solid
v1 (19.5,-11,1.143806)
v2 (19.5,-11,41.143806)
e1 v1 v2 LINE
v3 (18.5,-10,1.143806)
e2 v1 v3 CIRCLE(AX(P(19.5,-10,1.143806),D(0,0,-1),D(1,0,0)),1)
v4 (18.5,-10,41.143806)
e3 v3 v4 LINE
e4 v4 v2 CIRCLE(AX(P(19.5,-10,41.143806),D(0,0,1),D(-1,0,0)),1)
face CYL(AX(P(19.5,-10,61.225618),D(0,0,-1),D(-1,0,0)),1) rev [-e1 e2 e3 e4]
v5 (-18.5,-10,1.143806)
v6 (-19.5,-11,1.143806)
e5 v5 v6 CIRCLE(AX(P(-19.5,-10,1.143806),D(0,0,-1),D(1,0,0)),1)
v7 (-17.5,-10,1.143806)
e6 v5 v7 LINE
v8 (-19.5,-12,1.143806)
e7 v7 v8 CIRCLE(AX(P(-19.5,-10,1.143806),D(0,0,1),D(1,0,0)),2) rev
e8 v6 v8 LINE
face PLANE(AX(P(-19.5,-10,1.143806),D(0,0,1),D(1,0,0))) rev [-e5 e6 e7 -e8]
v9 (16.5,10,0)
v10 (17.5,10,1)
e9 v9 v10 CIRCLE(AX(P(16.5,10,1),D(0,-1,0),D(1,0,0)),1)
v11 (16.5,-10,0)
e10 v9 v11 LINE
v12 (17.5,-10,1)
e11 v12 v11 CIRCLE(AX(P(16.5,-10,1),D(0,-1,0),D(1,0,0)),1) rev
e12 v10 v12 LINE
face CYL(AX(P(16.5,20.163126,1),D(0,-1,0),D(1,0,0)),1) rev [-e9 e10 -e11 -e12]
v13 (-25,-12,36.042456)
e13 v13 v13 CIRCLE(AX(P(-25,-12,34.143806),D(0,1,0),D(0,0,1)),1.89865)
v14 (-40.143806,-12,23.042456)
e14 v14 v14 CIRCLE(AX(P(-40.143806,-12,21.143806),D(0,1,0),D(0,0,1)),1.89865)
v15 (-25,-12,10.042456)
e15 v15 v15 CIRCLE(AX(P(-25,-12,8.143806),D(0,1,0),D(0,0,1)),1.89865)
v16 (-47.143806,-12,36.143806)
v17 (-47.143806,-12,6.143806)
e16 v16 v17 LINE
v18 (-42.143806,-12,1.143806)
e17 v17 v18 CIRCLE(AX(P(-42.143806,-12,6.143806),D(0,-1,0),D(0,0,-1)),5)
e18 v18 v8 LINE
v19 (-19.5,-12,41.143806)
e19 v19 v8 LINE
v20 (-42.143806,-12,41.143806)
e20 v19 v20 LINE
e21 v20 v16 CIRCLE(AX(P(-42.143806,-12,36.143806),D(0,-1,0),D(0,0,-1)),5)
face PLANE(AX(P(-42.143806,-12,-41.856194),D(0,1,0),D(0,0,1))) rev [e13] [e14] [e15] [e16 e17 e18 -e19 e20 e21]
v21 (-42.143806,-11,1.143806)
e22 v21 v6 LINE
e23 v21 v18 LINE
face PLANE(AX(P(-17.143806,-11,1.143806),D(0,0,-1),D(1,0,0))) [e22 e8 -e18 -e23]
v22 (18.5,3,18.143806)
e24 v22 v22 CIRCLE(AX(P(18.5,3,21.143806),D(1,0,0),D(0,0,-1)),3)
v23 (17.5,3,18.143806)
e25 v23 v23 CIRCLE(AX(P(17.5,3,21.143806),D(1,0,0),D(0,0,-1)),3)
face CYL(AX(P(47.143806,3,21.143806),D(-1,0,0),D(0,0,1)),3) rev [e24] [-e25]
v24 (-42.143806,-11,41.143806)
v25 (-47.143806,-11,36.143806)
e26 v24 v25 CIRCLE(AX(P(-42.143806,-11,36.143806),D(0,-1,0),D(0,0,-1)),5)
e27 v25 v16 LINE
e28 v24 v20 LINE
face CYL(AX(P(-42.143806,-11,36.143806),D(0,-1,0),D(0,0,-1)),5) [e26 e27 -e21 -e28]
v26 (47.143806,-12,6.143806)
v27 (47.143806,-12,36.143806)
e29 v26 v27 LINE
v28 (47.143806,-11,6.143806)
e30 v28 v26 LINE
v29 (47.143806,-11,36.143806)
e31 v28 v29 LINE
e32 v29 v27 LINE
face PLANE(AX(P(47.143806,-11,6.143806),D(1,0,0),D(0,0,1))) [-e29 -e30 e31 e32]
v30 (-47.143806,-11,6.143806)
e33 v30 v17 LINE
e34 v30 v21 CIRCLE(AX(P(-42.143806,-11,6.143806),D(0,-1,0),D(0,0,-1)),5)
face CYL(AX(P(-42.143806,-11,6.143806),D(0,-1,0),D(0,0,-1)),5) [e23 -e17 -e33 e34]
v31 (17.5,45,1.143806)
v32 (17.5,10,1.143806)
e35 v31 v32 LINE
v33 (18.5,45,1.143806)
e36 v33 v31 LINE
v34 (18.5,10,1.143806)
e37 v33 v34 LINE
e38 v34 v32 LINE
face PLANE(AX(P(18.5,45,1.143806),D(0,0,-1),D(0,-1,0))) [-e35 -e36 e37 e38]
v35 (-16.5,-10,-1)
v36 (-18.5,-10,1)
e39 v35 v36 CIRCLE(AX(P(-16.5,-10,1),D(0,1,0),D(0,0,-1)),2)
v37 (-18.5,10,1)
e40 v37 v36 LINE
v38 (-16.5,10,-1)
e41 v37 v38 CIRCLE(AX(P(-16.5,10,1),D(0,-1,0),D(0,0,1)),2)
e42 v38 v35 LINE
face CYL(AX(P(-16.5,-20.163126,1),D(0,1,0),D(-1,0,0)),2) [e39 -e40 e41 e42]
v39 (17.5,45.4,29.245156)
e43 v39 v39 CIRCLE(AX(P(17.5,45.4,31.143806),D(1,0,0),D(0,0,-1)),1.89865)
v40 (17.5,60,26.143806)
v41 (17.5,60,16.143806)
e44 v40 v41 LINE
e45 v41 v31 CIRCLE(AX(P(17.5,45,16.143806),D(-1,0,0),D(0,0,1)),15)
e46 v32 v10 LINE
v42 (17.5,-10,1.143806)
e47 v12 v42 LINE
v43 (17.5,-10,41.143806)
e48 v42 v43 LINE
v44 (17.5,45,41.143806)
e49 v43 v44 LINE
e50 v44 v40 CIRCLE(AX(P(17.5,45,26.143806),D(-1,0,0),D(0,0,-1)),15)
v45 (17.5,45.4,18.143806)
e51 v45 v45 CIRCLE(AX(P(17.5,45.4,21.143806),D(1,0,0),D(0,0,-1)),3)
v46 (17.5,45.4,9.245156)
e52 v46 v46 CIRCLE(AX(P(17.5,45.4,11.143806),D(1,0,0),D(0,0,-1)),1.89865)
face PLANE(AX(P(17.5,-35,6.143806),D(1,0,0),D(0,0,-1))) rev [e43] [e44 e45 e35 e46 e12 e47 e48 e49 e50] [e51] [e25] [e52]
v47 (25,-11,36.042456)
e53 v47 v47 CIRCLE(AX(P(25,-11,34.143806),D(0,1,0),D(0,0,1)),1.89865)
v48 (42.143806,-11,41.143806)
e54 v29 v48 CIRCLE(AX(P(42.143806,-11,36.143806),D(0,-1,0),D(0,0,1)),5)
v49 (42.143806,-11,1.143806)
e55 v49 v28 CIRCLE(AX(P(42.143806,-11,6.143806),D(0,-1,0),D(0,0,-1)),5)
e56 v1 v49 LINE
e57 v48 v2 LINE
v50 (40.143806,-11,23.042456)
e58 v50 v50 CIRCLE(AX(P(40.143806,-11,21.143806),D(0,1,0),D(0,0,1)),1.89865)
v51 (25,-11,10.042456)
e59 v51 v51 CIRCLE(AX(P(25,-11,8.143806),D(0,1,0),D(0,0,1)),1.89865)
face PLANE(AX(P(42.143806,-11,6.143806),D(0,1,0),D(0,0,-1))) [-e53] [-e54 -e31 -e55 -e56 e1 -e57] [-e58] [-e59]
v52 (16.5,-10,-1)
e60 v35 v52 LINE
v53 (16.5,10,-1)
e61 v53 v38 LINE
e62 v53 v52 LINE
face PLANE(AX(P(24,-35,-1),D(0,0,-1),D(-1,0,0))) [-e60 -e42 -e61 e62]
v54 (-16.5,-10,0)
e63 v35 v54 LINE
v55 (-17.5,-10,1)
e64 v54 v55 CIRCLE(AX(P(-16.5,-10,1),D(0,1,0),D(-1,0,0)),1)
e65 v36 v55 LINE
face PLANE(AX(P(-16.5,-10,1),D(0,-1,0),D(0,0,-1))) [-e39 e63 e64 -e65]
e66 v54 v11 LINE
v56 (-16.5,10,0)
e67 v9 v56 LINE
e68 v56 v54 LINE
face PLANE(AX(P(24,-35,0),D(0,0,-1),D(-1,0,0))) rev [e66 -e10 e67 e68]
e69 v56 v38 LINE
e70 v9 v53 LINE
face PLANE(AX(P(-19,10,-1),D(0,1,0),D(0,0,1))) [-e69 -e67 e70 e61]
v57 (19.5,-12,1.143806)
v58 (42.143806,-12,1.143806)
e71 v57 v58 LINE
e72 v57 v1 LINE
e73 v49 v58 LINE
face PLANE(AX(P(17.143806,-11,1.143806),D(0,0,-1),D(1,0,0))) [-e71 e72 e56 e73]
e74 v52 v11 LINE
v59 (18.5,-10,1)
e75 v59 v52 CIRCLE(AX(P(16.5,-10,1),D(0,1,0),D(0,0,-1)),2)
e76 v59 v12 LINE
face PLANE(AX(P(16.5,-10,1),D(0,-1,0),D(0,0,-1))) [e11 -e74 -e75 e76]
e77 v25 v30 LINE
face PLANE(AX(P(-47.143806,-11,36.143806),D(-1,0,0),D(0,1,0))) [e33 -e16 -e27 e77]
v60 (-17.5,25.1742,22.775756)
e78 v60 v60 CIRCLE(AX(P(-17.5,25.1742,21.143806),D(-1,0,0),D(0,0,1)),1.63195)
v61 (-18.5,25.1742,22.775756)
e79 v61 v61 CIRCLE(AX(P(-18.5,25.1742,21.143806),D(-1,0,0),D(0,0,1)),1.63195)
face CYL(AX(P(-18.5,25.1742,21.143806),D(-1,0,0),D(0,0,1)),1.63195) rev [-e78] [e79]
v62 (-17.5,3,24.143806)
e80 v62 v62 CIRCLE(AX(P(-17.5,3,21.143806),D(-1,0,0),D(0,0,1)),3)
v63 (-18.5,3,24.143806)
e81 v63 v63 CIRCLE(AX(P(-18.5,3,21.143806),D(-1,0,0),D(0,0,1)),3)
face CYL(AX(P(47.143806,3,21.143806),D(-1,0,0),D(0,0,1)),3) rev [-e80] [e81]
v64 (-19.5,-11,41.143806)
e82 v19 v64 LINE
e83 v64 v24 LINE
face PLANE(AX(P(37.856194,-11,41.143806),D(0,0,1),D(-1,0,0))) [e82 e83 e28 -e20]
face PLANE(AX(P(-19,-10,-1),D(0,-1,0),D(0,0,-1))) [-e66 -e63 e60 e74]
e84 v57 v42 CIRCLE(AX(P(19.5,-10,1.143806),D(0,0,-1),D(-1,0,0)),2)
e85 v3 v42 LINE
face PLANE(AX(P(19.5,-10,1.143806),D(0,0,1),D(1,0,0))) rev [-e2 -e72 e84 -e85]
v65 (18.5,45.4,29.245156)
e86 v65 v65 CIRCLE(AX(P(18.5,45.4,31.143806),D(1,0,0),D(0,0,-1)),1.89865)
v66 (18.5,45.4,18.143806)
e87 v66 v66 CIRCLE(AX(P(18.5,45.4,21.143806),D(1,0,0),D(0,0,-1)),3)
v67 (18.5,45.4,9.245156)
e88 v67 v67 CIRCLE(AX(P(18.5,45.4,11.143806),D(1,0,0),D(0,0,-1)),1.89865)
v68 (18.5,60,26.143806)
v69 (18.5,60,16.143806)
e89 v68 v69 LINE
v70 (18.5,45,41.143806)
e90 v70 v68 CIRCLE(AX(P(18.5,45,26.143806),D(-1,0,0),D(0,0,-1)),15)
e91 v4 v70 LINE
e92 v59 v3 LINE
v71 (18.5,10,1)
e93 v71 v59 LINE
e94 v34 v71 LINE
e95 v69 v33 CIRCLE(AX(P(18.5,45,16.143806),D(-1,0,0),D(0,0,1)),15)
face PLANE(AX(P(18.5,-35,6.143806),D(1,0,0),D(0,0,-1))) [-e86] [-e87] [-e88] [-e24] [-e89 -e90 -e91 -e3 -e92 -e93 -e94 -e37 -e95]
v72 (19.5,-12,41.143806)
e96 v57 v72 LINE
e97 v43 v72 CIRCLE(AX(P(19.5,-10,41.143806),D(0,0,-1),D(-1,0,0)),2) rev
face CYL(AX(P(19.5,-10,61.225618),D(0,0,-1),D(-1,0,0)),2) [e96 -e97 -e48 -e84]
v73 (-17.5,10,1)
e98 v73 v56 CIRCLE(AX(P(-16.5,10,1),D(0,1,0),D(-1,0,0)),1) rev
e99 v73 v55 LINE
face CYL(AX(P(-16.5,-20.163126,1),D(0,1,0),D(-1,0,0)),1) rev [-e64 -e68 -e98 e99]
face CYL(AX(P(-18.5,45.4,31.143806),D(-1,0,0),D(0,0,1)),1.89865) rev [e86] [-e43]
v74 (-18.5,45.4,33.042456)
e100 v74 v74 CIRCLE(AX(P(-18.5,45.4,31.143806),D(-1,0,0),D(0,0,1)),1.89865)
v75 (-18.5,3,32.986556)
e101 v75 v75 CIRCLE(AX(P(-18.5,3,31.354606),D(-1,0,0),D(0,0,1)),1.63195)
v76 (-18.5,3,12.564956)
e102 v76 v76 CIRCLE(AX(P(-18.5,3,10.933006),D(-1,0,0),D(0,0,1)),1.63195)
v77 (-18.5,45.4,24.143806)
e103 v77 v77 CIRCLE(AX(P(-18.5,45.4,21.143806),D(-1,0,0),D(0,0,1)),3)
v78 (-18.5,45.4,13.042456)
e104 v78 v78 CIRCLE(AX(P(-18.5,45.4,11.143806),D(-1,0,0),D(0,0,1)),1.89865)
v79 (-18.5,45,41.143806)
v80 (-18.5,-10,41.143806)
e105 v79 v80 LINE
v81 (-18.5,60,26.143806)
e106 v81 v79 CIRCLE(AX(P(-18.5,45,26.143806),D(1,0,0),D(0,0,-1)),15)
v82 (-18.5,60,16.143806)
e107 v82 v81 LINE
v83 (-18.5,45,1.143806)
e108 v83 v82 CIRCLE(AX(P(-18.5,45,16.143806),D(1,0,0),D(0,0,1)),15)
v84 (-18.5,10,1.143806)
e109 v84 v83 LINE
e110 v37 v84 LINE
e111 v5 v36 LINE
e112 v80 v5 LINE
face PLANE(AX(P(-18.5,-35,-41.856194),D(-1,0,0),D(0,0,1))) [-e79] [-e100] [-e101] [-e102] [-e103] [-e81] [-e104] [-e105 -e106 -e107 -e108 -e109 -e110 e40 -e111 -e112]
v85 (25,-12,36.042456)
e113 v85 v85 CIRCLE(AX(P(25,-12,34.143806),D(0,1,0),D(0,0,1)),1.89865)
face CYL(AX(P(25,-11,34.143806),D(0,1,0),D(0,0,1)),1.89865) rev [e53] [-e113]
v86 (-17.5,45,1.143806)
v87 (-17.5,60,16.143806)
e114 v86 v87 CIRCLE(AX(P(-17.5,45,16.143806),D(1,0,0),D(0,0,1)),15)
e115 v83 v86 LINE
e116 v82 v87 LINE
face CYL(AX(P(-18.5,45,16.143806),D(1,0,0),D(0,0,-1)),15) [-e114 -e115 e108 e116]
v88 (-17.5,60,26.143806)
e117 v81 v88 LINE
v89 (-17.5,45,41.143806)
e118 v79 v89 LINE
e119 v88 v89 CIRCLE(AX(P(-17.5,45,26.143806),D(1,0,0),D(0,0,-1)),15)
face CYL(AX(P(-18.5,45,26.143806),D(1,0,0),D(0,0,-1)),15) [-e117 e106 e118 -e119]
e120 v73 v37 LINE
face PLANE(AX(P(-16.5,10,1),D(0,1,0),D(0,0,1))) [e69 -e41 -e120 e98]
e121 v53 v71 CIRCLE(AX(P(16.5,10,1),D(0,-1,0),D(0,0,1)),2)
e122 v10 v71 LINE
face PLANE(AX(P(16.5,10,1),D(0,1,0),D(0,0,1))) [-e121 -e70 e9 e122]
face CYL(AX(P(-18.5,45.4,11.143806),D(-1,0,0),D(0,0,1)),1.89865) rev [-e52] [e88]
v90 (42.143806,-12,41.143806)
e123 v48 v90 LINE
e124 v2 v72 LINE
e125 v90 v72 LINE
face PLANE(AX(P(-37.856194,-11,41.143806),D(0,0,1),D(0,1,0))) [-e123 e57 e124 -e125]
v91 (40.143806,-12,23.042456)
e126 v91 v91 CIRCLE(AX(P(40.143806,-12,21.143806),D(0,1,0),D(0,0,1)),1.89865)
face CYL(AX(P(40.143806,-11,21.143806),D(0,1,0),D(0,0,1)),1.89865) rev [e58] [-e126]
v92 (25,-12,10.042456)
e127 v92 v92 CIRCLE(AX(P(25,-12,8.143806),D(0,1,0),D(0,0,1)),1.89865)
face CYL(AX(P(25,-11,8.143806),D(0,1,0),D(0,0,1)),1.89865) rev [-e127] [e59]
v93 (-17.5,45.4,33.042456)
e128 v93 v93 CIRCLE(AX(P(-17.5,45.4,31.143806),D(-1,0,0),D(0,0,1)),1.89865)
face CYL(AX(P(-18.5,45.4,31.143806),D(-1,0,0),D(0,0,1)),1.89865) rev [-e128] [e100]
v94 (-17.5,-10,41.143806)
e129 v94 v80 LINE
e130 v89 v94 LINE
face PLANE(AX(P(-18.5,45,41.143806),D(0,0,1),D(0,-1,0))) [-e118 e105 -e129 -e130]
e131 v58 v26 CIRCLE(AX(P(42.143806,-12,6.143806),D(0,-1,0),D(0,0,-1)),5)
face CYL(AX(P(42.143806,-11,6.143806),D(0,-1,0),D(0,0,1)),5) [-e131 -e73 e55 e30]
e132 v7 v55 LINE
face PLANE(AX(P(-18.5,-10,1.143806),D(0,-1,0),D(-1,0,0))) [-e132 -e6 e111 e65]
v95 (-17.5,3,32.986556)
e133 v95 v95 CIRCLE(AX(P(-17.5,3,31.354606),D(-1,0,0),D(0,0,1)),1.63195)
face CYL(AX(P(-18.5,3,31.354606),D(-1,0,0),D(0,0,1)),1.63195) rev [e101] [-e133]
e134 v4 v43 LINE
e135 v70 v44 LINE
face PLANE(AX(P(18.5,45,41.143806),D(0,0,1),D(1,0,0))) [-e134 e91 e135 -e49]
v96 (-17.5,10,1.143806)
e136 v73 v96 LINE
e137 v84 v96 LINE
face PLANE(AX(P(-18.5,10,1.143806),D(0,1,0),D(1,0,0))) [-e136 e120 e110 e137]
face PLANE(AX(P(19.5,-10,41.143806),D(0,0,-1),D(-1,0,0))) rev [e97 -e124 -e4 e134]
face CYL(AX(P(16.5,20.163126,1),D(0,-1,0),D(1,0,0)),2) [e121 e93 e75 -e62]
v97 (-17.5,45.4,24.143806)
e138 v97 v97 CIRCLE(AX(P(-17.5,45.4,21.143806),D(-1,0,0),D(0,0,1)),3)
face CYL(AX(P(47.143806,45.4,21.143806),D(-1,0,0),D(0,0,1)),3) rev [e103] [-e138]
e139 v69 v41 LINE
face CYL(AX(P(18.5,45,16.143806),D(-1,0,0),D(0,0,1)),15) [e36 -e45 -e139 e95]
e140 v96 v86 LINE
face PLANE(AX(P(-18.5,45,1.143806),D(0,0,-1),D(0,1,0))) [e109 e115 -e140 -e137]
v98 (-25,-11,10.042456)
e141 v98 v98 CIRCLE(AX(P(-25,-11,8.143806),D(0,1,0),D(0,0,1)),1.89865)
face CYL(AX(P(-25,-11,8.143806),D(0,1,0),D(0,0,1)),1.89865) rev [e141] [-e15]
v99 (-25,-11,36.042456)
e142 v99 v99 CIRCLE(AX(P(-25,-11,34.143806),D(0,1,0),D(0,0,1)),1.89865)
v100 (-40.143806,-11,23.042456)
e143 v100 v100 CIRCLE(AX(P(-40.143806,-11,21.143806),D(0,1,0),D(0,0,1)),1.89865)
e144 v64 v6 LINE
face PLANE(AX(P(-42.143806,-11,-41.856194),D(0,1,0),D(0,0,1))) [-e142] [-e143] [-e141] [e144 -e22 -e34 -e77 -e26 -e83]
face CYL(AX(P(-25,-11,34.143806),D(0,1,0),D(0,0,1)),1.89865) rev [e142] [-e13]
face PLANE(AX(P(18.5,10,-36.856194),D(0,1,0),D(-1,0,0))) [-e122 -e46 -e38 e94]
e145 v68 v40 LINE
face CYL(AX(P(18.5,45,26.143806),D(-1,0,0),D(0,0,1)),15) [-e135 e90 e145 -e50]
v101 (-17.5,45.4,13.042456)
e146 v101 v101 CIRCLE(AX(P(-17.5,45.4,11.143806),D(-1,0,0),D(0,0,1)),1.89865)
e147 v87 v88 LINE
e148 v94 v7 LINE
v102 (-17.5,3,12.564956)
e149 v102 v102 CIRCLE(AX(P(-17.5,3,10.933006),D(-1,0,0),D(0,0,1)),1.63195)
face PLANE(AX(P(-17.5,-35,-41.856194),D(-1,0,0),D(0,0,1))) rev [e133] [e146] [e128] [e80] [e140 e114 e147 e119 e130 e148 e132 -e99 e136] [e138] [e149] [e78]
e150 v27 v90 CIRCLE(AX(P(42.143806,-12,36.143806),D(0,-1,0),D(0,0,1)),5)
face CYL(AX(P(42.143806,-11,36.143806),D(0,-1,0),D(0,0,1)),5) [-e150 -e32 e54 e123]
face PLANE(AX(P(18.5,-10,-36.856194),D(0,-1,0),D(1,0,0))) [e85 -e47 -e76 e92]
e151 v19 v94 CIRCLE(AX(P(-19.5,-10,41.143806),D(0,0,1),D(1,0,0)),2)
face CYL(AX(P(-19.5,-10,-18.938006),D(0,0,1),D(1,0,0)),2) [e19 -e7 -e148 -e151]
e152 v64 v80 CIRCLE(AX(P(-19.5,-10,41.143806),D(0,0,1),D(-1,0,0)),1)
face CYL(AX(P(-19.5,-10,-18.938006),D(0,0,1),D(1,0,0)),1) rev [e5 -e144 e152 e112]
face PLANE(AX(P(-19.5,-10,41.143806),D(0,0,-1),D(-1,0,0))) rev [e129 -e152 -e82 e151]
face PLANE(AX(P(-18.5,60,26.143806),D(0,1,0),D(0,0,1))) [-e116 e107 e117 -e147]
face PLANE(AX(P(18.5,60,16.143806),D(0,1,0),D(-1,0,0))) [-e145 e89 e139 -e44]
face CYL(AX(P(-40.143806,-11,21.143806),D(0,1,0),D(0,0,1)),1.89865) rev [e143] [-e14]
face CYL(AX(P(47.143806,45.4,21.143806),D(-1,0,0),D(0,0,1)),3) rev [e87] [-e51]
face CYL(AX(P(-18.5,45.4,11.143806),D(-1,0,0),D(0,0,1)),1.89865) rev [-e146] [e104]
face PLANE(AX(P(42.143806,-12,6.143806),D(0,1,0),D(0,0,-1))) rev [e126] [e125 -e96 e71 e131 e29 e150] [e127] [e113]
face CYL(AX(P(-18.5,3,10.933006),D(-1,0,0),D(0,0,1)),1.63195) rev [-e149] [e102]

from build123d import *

# Parameters (mm, degrees)
BASE_FLANGE1_DEPTH         = 1
SKETCHED_START             = -40
SKETCHED_BEND3_OUTLINE_W   = 40
SKETCHED_BEND3_OUTLINE_H   = 1
SKETCHED_BEND3_DEPTH       = 28.18876
SKETCHED_START_2           = -11.4496
SKETCHED_BEND3_2_DEPTH     = 0.4496
SKETCHED_START_3           = -12
SKETCHED_BEND3_3_DEPTH     = 2
SKETCHED_START_4           = -60
SKETCHED_BEND3_4_DEPTH     = 120
SKETCHED_BEND7_DEPTH       = 72
SKETCHED_START_5           = -10
SKETCHED_BEND7_2_OUTLINE_W = 1
SKETCHED_BEND7_2_OUTLINE_H = 40
SKETCHED_BEND7_2_DEPTH     = 55
SKETCHED_BEND7_3_DEPTH     = 20
SKETCHED_BEND7_4_DEPTH     = 2
SKETCHED_START_6           = 45
SKETCHED_BEND7_5_OUTLINE_W = 1
SKETCHED_BEND7_5_OUTLINE_H = 40
SKETCHED_BEND7_5_DEPTH     = 15
SKETCHED_START_7           = 1.14380551
SKETCHED_BEND7_6_DEPTH     = 40
SKETCHED_START_8           = -42.14380551
SKETCHED_BEND7_7_DEPTH     = 84.28761102
SKETCH9_R                  = 3
CUT_EXTRUDE1_DEPTH         = 98.989397047
F_4_CLEARANCE_HOLE1_D      = 3.2639
F_4_CLEARANCE_HOLE1_DEPTH  = 10
F_4_CLEARANCE_HOLE1_TIP    = 0.980574487
F_6_CLEARANCE_HOLE1_D      = 3.7973
F_6_CLEARANCE_HOLE2_D      = 3.7973


with BuildPart() as part:
    # Base-Flange1: sheet metal written as solids
    # Sketch1 → Base-Flange1 (new body)
    with BuildSketch(Plane.XY):
        with BuildLine():
            Line((-19, -10), (-19, -35))
            ThreePointArc((-19, -35), (-20.464466094, -38.535533906), (-24, -40))
            Line((-24, -40), (-54, -40))
            ThreePointArc((-54, -40), (-57.535533906, -38.535533906), (-59, -35))
            Line((-59, -35), (-59, 45))
            ThreePointArc((-59, 45), (-54.606601718, 55.606601718), (-44, 60))
            Line((-44, 60), (-34, 60))
            ThreePointArc((-34, 60), (-23.393398282, 55.606601718), (-19, 45))
            Line((-19, 45), (-19, 10))
            Line((-19, 10), (19, 10))
            Line((19, 10), (19, 45))
            ThreePointArc((19, 45), (23.393398282, 55.606601718), (34, 60))
            Line((34, 60), (44, 60))
            ThreePointArc((44, 60), (54.606601718, 55.606601718), (59, 45))
            Line((59, 45), (59, -35))
            ThreePointArc((59, -35), (57.535533906, -38.535533906), (54, -40))
            Line((54, -40), (24, -40))
            ThreePointArc((24, -40), (20.464466094, -38.535533906), (19, -35))
            Line((19, -35), (19, -10))
            Line((19, -10), (-19, -10))
        make_face()
    extrude(amount=-BASE_FLANGE1_DEPTH)

    # Sketched Bend3: read off the stored shape, not the designer's step
    # Sketched Bend3 outline → Sketched Bend3 (cut)
    with BuildSketch(Plane(origin=(0, 0, 0), x_dir=(1, 0, 0), z_dir=(0, 1, 0)).offset(SKETCHED_START)):
        with Locations((-39, 0.5)):
            Rectangle(SKETCHED_BEND3_OUTLINE_W, SKETCHED_BEND3_OUTLINE_H)
        with Locations((39, 0.5)):
            Rectangle(SKETCHED_BEND3_OUTLINE_W, SKETCHED_BEND3_OUTLINE_H)
    extrude(amount=SKETCHED_BEND3_DEPTH, mode=Mode.SUBTRACT)

    # Sketched Bend3 2 outline → Sketched Bend3 2 (add)
    with BuildSketch(Plane(origin=(0, 0, 0), x_dir=(1, 0, 0), z_dir=(0, 1, 0)).offset(SKETCHED_START_2)):
        with BuildLine():
            Line((-19, 1), (-19, 24.64380551))
            ThreePointArc((-19, 24.64380551), (-20.464466094, 28.179339416), (-24, 29.64380551))
            Line((-24, 29.64380551), (-54, 29.64380551))
            ThreePointArc((-54, 29.64380551), (-57.535533906, 28.179339416), (-59, 24.64380551))
            Line((-59, 24.64380551), (-59, 1))
            Line((-59, 1), (-19, 1))
        make_face()
        with BuildLine():
            Line((19, 24.64380551), (19, 1))
            Line((19, 1), (59, 1))
            Line((59, 1), (59, 24.64380551))
            ThreePointArc((59, 24.64380551), (57.535533906, 28.179339416), (54, 29.64380551))
            Line((54, 29.64380551), (24, 29.64380551))
            ThreePointArc((24, 29.64380551), (20.464466094, 28.179339416), (19, 24.64380551))
        make_face()
    extrude(amount=SKETCHED_BEND3_2_DEPTH)

    # Sketched Bend3 3 outline → Sketched Bend3 3 (add)
    with BuildSketch(Plane(origin=(0, 0, 0), x_dir=(1, 0, 0), z_dir=(0, 1, 0)).offset(SKETCHED_START_3)):
        with BuildLine():
            Line((-19, 1), (-19, 24.64380551))
            ThreePointArc((-19, 24.64380551), (-20.464466094, 28.179339416), (-24, 29.64380551))
            Line((-24, 29.64380551), (-54, 29.64380551))
            ThreePointArc((-54, 29.64380551), (-57.535533906, 28.179339416), (-59, 24.64380551))
            Line((-59, 24.64380551), (-59, 1))
            Line((-59, 1), (-19, 1))
        make_face()
        with BuildLine():
            ThreePointArc((59, 24.64380551), (57.535533906, 28.179339416), (54, 29.64380551))
            Line((54, 29.64380551), (24, 29.64380551))
            ThreePointArc((24, 29.64380551), (20.464466094, 28.179339416), (19, 24.64380551))
            Line((19, 24.64380551), (19, 1))
            Line((19, 1), (59, 1))
            Line((59, 1), (59, 24.64380551))
        make_face()
    extrude(amount=SKETCHED_BEND3_3_DEPTH)

    # Sketched Bend3 4 outline → Sketched Bend3 4 (cut)
    with BuildSketch(Plane.YZ.offset(SKETCHED_START_4)):
        with BuildLine():
            Line((-11, -2), (-11, -29.64380551))
            Line((-11, -29.64380551), (-10, -29.64380551))
            Line((-10, -29.64380551), (-10, -1))
            ThreePointArc((-10, -1), (-10.707106781, -1.292893219), (-11, -2))
        make_face()
        with BuildLine():
            Line((-12, -1), (-12, -2))
            ThreePointArc((-12, -2), (-11.414213562, -0.585786438), (-10, 0))
            Line((-10, 0), (-11.81124, 0))
            Line((-11.81124, 0), (-11.81124, -1))
            Line((-11.81124, -1), (-12, -1))
        make_face()
    extrude(amount=SKETCHED_BEND3_4_DEPTH, mode=Mode.SUBTRACT)

    # Sketched Bend7: read off the stored shape, not the designer's step
    # Sketched Bend7 outline → Sketched Bend7 (cut)
    with BuildSketch(Plane(origin=(0, 0, 0), x_dir=(1, 0, 0), z_dir=(0, 1, 0)).offset(SKETCHED_START_3)):
        with BuildLine():
            ThreePointArc((-18.232050807, 0), (-17.5, 0.732050807), (-16.5, 1))
            Line((-16.5, 1), (-19, 1))
            Line((-19, 1), (-19, 24.64380551))
            ThreePointArc((-19, 24.64380551), (-20.464466094, 28.179339416), (-24, 29.64380551))
            Line((-24, 29.64380551), (-54, 29.64380551))
            ThreePointArc((-54, 29.64380551), (-57.535533906, 28.179339416), (-59, 24.64380551))
            Line((-59, 24.64380551), (-59, 0))
            Line((-59, 0), (-18.232050807, 0))
        make_face()
        with BuildLine():
            Line((19, 1), (16.5, 1))
            ThreePointArc((16.5, 1), (17.5, 0.732050807), (18.232050807, 0))
            Line((18.232050807, 0), (59, 0))
            Line((59, 0), (59, 24.64380551))
            ThreePointArc((59, 24.64380551), (57.535533906, 28.179339416), (54, 29.64380551))
            Line((54, 29.64380551), (24, 29.64380551))
            ThreePointArc((24, 29.64380551), (20.464466094, 28.179339416), (19, 24.64380551))
            Line((19, 24.64380551), (19, 1))
        make_face()
    extrude(amount=SKETCHED_BEND7_DEPTH, mode=Mode.SUBTRACT)



with BuildPart() as body_2:
    # Sketched Bend7 2 outline → Sketched Bend7 2 (new body)
    with BuildSketch(Plane(origin=(0, 0, 0), x_dir=(1, 0, 0), z_dir=(0, 1, 0)).offset(SKETCHED_START_5)):
        with Locations((-18, -21.14380551)):
            Rectangle(SKETCHED_BEND7_2_OUTLINE_W, SKETCHED_BEND7_2_OUTLINE_H)
        with Locations((18, -21.14380551)):
            Rectangle(SKETCHED_BEND7_2_OUTLINE_W, SKETCHED_BEND7_2_OUTLINE_H)
    extrude(amount=SKETCHED_BEND7_2_DEPTH)


with BuildPart() as part_1:
    add(part.part)

    add(body_2.part)  # Sketched Bend7 3 merges body 2
    # Sketched Bend7 3 outline → Sketched Bend7 3 (add)
    with BuildSketch(Plane(origin=(0, 0, 0), x_dir=(1, 0, 0), z_dir=(0, 1, 0)).offset(SKETCHED_START_5)):
        with BuildLine():
            Line((-16.5, 0), (-18.232050807, 0))
            ThreePointArc((-18.232050807, 0), (-18.431851652, -0.48236191), (-18.5, -1))
            Line((-18.5, -1), (-18.5, -1.14380551))
            Line((-18.5, -1.14380551), (-17.5, -1.14380551))
            Line((-17.5, -1.14380551), (-17.5, -1))
            ThreePointArc((-17.5, -1), (-17.207106781, -0.292893219), (-16.5, 0))
        make_face()
        with BuildLine():
            ThreePointArc((18.5, -1), (18.431851652, -0.48236191), (18.232050807, 0))
            Line((18.232050807, 0), (16.5, 0))
            ThreePointArc((16.5, 0), (17.207106781, -0.292893219), (17.5, -1))
            Line((17.5, -1), (17.5, -1.14380551))
            Line((17.5, -1.14380551), (18.5, -1.14380551))
            Line((18.5, -1.14380551), (18.5, -1))
        make_face()
    extrude(amount=SKETCHED_BEND7_3_DEPTH)

    # Sketched Bend7 4 outline → Sketched Bend7 4 (add)
    with BuildSketch(Plane(origin=(0, 0, 0), x_dir=(1, 0, 0), z_dir=(0, 1, 0)).offset(SKETCHED_START_3)):
        with BuildLine():
            ThreePointArc((-47.14380551, -36.14380551), (-45.679339416, -39.679339416), (-42.14380551, -41.14380551))
            Line((-42.14380551, -41.14380551), (-17.5, -41.14380551))
            Line((-17.5, -41.14380551), (-17.5, -1.14380551))
            Line((-17.5, -1.14380551), (-42.14380551, -1.14380551))
            ThreePointArc((-42.14380551, -1.14380551), (-45.679339416, -2.608271604), (-47.14380551, -6.14380551))
            Line((-47.14380551, -6.14380551), (-47.14380551, -36.14380551))
        make_face()
        with BuildLine():
            ThreePointArc((42.14380551, -41.14380551), (45.679339416, -39.679339416), (47.14380551, -36.14380551))
            Line((47.14380551, -36.14380551), (47.14380551, -6.14380551))
            ThreePointArc((47.14380551, -6.14380551), (45.679339416, -2.608271604), (42.14380551, -1.14380551))
            Line((42.14380551, -1.14380551), (17.5, -1.14380551))
            Line((17.5, -1.14380551), (17.5, -41.14380551))
            Line((17.5, -41.14380551), (42.14380551, -41.14380551))
        make_face()
    extrude(amount=SKETCHED_BEND7_4_DEPTH)

    # Sketched Bend7 5 outline → Sketched Bend7 5 (add)
    with BuildSketch(Plane(origin=(0, 0, 0), x_dir=(1, 0, 0), z_dir=(0, 1, 0)).offset(SKETCHED_START_6)):
        with Locations((-18, -21.14380551)):
            Rectangle(SKETCHED_BEND7_5_OUTLINE_W, SKETCHED_BEND7_5_OUTLINE_H)
        with Locations((18, -21.14380551)):
            Rectangle(SKETCHED_BEND7_5_OUTLINE_W, SKETCHED_BEND7_5_OUTLINE_H)
    extrude(amount=SKETCHED_BEND7_5_DEPTH)

    # Sketched Bend7 6 outline → Sketched Bend7 6 (cut)
    with BuildSketch(Plane.XY.offset(SKETCHED_START_7)):
        with BuildLine():
            Line((-47.14380551, -11), (-19.5, -11))
            ThreePointArc((-19.5, -11), (-18.792893219, -10.707106781), (-18.5, -10))
            Line((-18.5, -10), (-47.14380551, -10))
            Line((-47.14380551, -10), (-47.14380551, -11))
        make_face()
        with BuildLine():
            ThreePointArc((-17.5, -10), (-18.085786438, -11.414213562), (-19.5, -12))
            Line((-19.5, -12), (-17.5, -12))
            Line((-17.5, -12), (-17.5, -10))
        make_face()
        with BuildLine():
            Line((19.5, -11), (47.14380551, -11))
            Line((47.14380551, -11), (47.14380551, -10))
            Line((47.14380551, -10), (18.5, -10))
            ThreePointArc((18.5, -10), (18.792893219, -10.707106781), (19.5, -11))
        make_face()
        with BuildLine():
            Line((17.5, -12), (19.5, -12))
            ThreePointArc((19.5, -12), (18.085786438, -11.414213562), (17.5, -10))
            Line((17.5, -10), (17.5, -12))
        make_face()
    extrude(amount=SKETCHED_BEND7_6_DEPTH, mode=Mode.SUBTRACT)

    # Sketched Bend7 7 outline → Sketched Bend7 7 (cut)
    with BuildSketch(Plane.YZ.offset(SKETCHED_START_8)):
        with BuildLine():
            ThreePointArc((45, 41.14380551), (55.606601718, 36.750407228), (60, 26.14380551))
            Line((60, 26.14380551), (60, 41.14380551))
            Line((60, 41.14380551), (45, 41.14380551))
        make_face()
        with BuildLine():
            ThreePointArc((60, 16.14380551), (55.606601718, 5.537203792), (45, 1.14380551))
            Line((45, 1.14380551), (60, 1.14380551))
            Line((60, 1.14380551), (60, 16.14380551))
        make_face()
    extrude(amount=SKETCHED_BEND7_7_DEPTH, mode=Mode.SUBTRACT)

    # Sketch9 → Cut-Extrude1 (cut, through all)
    with BuildSketch(Plane.ZY.offset(18.5)):
        with Locations(Location((21.14380551, 3, 0), (0, 0, 180))):
            Circle(SKETCH9_R)
        with Locations(Location((21.14380551, 45.4, 0), (0, 0, 180))):
            Circle(SKETCH9_R)
    extrude(amount=-CUT_EXTRUDE1_DEPTH, mode=Mode.SUBTRACT)

    # #4 Clearance Hole1
    with Locations(Plane.ZY.offset(18.5)):
        with Locations((10.93300551, 3), (31.35460551, 3), (21.14380551, 25.1742)):
            Hole(F_4_CLEARANCE_HOLE1_D / 2, depth=F_4_CLEARANCE_HOLE1_DEPTH)
            with Locations((0, 0, -(F_4_CLEARANCE_HOLE1_DEPTH + F_4_CLEARANCE_HOLE1_TIP / 2))):  # 118° drill point
                Cone(0, F_4_CLEARANCE_HOLE1_D / 2, F_4_CLEARANCE_HOLE1_TIP, mode=Mode.SUBTRACT)

    # #6 Clearance Hole1 (through all)
    with Locations(Plane.ZY.offset(18.5)):
        with Locations((11.14380551, 45.4), (31.14380551, 45.4)):
            Hole(F_6_CLEARANCE_HOLE1_D / 2)

    # #6 Clearance Hole2 (through all)
    with Locations(Plane(origin=(0, -11, 0), x_dir=(1, 0, 0), z_dir=(0, 1, 0))):
        with Locations((-40.14380551, -21.14380551), (-25, -34.14380551), (25, -34.14380551), (40.14380551, -21.14380551), (-25, -8.14380551), (25, -8.14380551)):
            Hole(F_6_CLEARANCE_HOLE2_D / 2)


solid = part_1.part
